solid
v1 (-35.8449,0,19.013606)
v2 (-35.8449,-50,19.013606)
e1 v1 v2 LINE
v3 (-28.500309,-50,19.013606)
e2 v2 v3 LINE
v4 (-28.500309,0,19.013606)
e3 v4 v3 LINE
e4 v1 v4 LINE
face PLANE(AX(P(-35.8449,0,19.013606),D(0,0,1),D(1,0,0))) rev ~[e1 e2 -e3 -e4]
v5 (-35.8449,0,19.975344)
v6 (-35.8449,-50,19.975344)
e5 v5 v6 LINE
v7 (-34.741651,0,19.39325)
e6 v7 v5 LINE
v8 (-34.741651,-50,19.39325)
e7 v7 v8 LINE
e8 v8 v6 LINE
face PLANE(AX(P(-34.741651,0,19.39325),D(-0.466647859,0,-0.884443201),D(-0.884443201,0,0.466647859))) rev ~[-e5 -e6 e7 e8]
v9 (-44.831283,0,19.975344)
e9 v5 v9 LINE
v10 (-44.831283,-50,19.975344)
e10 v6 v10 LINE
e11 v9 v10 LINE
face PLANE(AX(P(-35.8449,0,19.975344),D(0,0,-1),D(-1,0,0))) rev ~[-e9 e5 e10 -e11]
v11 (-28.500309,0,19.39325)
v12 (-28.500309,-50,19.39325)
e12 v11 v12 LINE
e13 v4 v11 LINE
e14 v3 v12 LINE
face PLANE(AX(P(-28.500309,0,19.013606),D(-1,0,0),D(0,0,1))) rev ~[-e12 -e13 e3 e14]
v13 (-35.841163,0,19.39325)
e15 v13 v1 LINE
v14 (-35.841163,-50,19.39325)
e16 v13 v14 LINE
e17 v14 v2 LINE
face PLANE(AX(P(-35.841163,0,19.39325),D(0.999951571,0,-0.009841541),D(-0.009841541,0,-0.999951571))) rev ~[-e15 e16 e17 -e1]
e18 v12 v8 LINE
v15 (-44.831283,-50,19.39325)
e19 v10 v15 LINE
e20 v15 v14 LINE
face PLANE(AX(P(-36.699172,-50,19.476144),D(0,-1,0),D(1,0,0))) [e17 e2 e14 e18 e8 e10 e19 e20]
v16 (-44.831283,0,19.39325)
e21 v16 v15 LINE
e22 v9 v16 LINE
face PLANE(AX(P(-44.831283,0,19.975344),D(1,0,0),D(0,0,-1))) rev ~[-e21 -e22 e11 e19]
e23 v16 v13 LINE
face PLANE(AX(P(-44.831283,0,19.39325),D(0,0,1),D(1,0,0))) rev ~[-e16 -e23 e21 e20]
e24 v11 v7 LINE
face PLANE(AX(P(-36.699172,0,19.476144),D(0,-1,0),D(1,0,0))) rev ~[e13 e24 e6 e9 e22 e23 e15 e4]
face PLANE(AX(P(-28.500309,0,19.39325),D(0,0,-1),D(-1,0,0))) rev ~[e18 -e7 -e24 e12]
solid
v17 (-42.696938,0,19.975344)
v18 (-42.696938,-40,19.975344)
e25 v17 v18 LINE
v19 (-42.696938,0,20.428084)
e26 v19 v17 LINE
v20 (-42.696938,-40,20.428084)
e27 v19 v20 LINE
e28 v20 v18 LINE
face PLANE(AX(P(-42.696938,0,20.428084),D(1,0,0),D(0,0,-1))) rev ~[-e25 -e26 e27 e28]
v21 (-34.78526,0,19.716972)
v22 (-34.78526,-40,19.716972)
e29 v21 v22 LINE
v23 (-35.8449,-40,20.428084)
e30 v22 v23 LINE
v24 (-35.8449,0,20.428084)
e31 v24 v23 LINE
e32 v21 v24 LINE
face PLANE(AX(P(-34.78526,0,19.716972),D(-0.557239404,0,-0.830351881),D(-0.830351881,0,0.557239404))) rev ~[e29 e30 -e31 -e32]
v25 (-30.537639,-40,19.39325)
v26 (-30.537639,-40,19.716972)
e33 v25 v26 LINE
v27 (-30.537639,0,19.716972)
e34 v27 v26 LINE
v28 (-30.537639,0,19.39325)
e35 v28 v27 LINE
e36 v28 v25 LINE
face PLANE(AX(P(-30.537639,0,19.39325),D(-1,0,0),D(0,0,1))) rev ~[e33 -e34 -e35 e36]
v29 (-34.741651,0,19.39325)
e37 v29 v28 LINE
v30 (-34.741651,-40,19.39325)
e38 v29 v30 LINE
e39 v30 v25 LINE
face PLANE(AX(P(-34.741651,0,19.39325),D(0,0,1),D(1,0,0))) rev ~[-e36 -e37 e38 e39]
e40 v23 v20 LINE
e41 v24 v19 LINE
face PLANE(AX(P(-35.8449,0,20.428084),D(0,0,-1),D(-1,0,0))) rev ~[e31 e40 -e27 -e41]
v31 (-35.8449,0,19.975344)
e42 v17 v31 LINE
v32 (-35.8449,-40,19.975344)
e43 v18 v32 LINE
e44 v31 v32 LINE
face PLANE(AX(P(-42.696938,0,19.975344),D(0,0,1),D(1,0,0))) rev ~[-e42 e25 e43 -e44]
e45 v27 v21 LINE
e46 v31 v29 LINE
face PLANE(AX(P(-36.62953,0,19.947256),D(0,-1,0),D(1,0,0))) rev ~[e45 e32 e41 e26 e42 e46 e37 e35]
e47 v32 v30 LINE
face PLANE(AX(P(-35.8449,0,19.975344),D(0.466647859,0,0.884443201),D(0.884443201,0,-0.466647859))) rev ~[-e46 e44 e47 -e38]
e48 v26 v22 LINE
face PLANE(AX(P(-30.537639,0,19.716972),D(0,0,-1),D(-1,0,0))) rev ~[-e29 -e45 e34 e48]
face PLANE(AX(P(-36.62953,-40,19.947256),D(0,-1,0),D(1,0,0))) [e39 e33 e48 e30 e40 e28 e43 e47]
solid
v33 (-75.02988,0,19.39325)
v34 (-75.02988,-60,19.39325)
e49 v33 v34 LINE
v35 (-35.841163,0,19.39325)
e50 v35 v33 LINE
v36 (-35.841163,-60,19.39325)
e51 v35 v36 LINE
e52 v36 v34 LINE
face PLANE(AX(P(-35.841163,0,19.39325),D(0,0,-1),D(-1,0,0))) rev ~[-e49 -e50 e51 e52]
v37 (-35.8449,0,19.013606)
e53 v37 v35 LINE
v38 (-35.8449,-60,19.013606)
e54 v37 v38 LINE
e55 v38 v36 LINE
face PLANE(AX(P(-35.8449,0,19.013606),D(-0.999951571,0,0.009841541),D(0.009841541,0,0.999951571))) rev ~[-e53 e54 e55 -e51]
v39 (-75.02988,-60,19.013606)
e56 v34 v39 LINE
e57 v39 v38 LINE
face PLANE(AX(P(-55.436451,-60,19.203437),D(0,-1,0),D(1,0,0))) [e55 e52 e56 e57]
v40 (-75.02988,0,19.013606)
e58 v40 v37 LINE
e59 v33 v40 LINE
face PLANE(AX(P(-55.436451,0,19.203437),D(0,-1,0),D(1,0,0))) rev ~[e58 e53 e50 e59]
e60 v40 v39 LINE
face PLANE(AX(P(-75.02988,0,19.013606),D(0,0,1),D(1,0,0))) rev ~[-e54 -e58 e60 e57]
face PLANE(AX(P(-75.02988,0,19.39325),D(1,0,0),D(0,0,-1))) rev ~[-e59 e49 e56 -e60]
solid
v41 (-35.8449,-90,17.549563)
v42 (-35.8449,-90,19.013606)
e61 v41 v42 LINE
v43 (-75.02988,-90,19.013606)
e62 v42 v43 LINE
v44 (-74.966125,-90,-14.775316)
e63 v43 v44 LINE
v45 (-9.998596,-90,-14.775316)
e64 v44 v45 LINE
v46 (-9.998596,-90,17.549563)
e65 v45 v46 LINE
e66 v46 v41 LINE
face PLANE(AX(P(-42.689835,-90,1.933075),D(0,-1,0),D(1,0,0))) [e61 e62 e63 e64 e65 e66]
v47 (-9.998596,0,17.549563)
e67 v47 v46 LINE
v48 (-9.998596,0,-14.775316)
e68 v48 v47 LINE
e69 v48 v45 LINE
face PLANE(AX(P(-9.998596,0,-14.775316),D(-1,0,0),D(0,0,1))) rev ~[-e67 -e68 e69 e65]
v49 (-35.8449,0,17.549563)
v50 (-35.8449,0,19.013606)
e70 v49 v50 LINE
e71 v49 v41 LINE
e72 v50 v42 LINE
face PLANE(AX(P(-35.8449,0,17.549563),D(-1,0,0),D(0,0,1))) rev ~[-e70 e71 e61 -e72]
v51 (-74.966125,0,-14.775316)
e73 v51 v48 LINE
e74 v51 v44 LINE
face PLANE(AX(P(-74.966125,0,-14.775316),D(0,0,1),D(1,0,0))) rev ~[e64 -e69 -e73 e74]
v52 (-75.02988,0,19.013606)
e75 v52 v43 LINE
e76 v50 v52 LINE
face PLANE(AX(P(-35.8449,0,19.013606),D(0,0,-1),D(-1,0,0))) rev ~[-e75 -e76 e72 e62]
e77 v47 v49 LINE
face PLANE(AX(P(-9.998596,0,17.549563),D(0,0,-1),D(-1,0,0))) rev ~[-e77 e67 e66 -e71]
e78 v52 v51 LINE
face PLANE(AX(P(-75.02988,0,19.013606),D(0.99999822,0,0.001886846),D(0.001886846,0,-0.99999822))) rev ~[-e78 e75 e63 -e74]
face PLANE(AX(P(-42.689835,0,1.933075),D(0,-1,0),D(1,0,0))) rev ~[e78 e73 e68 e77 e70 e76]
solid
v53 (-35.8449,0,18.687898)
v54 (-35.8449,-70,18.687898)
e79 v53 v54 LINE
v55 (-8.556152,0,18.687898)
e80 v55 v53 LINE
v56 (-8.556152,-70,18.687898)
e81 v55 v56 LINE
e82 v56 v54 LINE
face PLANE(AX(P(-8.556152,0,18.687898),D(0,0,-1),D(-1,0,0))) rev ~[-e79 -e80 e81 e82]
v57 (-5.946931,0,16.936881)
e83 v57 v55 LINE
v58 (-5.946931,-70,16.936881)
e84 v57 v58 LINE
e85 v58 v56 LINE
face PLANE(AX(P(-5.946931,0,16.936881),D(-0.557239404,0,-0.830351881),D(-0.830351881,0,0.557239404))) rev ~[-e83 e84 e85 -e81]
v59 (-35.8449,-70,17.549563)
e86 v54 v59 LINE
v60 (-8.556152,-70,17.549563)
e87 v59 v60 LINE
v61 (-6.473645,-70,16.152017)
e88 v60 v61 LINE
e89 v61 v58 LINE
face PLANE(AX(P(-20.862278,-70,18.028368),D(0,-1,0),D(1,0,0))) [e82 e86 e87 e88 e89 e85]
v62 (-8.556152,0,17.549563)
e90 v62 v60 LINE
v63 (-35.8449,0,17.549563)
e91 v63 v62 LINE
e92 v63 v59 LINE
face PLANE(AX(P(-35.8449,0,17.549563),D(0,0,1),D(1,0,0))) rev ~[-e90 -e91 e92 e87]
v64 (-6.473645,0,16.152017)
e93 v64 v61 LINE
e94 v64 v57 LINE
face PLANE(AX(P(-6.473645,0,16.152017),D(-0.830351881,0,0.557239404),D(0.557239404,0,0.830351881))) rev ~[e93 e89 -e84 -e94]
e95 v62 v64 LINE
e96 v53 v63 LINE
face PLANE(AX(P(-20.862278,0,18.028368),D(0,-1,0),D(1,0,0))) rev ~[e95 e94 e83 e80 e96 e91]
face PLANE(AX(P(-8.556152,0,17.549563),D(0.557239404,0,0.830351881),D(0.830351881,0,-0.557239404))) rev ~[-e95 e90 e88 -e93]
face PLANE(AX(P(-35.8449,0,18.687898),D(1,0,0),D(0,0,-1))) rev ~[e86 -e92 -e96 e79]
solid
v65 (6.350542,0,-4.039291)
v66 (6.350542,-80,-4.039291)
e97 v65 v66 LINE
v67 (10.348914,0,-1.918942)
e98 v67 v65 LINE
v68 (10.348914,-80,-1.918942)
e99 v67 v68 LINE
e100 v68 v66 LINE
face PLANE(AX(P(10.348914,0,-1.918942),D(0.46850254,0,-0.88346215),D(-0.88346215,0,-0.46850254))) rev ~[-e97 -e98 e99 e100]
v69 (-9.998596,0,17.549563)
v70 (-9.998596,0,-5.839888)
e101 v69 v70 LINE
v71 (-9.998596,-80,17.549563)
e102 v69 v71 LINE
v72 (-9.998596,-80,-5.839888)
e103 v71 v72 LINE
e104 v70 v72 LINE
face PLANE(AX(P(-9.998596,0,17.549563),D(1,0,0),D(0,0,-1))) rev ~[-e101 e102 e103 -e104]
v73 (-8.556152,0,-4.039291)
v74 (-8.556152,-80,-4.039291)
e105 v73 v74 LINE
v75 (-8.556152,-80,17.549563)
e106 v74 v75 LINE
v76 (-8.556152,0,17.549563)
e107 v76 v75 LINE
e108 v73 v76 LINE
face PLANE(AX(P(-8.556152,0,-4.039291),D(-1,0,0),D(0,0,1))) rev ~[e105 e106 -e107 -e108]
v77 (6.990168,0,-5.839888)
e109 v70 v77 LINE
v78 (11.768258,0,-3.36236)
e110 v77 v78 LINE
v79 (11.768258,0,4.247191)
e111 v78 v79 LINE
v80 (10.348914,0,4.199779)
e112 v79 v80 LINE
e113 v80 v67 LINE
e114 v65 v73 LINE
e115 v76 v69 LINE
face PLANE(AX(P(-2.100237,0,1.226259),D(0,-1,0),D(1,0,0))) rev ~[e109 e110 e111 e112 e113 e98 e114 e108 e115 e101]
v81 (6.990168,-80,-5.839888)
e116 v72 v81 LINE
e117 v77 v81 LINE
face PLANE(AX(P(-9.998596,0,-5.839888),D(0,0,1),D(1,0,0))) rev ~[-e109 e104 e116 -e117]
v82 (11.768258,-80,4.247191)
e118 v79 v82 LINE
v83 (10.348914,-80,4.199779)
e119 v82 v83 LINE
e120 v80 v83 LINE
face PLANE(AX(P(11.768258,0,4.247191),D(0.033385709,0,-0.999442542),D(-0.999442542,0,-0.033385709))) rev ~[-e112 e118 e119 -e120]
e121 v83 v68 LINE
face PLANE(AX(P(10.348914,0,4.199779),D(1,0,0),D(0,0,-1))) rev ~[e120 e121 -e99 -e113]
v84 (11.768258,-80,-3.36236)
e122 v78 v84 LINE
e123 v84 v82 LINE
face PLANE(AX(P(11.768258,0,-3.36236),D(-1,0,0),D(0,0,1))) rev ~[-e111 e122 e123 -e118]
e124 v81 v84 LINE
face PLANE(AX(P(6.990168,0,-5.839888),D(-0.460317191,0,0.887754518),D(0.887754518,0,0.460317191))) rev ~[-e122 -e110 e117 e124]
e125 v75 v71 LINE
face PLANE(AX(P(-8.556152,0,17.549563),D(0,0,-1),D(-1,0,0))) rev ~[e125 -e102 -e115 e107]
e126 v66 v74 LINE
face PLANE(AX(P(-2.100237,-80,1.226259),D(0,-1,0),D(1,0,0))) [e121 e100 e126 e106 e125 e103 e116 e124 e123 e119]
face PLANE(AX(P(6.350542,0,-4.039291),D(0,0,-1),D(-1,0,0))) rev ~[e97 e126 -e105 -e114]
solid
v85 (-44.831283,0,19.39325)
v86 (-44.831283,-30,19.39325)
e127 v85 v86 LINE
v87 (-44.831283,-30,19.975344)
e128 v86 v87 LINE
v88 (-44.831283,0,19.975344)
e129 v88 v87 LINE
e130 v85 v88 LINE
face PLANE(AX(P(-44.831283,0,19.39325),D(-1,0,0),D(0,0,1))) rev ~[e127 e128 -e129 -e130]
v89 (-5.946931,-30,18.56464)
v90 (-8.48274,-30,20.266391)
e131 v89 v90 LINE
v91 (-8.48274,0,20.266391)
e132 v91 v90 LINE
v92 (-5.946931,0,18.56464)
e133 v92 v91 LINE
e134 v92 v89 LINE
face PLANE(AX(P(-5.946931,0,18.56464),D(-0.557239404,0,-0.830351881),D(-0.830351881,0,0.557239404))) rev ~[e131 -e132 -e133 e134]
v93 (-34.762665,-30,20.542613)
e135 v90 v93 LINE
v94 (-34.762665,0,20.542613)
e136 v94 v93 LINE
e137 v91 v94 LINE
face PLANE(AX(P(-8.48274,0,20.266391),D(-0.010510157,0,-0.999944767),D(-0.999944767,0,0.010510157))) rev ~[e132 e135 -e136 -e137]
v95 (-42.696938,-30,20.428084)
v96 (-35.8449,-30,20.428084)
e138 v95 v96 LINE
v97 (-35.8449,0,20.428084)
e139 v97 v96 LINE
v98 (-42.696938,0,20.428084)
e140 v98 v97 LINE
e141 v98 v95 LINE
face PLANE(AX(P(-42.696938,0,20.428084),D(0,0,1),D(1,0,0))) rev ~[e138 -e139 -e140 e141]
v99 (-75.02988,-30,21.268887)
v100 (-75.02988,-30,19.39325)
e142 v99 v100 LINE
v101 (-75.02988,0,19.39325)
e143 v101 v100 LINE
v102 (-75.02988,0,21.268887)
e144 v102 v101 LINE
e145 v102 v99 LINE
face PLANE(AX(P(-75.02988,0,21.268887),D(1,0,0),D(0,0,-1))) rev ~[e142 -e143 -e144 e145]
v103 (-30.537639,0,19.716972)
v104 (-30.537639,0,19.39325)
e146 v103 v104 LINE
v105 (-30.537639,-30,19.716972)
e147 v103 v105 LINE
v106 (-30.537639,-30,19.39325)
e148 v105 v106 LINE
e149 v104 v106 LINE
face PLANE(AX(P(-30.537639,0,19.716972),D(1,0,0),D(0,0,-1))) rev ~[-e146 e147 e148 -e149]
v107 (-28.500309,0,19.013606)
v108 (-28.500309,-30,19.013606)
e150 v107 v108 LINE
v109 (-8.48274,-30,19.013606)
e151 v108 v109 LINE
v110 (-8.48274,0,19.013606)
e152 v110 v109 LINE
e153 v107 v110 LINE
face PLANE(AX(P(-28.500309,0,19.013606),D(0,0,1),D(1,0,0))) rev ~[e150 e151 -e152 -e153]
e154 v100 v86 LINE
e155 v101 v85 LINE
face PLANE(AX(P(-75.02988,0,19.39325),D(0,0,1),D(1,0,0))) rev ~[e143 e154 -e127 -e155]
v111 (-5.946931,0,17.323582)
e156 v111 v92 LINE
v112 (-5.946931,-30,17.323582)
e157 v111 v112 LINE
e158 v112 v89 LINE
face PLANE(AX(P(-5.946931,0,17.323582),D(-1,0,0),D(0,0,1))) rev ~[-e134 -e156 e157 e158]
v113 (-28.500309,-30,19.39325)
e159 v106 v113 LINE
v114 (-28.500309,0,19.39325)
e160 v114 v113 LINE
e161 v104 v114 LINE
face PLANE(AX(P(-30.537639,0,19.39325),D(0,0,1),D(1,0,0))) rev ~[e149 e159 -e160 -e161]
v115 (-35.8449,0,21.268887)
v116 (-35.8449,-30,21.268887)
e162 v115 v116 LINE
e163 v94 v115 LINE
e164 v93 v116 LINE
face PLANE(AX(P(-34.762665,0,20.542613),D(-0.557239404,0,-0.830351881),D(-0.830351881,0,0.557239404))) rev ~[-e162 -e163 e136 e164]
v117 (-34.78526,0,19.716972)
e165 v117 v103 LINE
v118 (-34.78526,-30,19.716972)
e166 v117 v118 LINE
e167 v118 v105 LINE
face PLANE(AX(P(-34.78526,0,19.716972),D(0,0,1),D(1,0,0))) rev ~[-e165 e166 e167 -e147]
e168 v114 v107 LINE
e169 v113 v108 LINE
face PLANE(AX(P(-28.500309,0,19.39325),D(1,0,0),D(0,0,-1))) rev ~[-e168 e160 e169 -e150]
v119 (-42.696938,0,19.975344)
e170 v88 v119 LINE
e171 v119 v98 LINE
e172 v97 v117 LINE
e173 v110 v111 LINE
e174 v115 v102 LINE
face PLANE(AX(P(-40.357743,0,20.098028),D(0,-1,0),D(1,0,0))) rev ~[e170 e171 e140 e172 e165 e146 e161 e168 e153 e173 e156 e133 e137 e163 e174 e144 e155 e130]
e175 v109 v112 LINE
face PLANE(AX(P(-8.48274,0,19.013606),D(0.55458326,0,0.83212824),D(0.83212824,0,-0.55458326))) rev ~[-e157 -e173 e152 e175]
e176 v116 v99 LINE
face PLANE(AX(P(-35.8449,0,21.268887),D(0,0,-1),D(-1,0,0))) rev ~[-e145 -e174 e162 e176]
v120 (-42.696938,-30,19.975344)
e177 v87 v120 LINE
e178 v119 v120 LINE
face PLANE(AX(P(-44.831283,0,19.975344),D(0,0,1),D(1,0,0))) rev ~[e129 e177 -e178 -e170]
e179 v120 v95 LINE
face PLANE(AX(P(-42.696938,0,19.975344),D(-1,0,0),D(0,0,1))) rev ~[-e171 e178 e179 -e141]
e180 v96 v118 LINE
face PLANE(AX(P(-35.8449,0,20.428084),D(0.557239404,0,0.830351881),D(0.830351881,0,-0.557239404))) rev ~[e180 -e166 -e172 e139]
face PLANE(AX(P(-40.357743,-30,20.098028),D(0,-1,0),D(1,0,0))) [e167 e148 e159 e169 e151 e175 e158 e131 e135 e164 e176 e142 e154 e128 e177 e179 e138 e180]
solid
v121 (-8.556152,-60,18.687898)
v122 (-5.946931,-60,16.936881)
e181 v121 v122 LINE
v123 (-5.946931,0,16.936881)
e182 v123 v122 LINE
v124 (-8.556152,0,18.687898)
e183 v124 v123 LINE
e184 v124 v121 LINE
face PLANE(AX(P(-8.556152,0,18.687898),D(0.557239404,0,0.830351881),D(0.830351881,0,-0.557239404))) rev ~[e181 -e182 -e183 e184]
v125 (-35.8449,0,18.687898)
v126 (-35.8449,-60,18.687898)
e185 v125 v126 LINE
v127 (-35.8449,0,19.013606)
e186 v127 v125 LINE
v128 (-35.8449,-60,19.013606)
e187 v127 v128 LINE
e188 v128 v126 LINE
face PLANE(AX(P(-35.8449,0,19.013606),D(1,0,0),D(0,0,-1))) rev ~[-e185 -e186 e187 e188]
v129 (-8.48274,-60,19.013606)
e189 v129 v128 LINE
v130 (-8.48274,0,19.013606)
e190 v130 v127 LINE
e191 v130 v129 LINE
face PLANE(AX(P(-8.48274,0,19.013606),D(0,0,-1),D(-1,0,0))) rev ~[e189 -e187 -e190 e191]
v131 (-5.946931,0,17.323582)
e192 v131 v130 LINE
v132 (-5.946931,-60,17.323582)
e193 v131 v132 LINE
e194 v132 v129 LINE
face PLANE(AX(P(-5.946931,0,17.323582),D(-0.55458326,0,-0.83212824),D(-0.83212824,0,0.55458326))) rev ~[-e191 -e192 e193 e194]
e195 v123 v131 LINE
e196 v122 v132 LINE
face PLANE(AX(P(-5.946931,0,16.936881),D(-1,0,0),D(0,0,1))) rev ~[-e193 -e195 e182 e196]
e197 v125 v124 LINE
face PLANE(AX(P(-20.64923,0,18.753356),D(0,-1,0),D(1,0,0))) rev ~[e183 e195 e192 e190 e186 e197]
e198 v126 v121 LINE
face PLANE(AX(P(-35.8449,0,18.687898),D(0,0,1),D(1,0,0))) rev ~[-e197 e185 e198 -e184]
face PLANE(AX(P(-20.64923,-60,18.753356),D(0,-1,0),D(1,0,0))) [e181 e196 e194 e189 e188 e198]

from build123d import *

# Parameters (mm, degrees)
F1_DEPTH = 90
F2_DEPTH = 80
F3_DEPTH = 70
F4_DEPTH = 60
F5_DEPTH = 60
F6_DEPTH = 50
F7_DEPTH = 40
F8_DEPTH = 30


# Not quite as in the source:
# - a feature names something its author has since deleted; it is built from what else it names


with BuildPart() as f1:
    # F0 (on Front) → F1 (new body)
    with BuildSketch(Plane.XZ):
        Polygon((-35.844899714, 19.0136060119), (-75.0298798084, 19.0136060119), (-74.9661251903, -14.775316231), (-9.9985962734, -14.775316231), (-9.9985962734, -5.8398880064), (-9.9985962734, 16.2808988243), (-9.9985962734, 17.5495628755), (-35.844899714, 17.5495628755), (-35.844899714, 18.6878981805), align=None)
    extrude(amount=F1_DEPTH)


with BuildPart() as f2:
    # F0 (on Front) → F2 (new body)
    with BuildSketch(Plane.XZ):
        Polygon((-9.9985962734, 16.2808988243), (-9.9985962734, -5.8398880064), (6.9901682436, -5.8398880064), (11.7682581767, -3.3623597119), (11.7682581767, 4.2471913621), (10.3489141911, 4.1997791268), (10.3489141911, -1.9189424347), (6.350541953, -4.0392908268), (-8.5561517044, -4.0392908268), (-8.5561517044, 17.5495628755), (-9.9985962734, 17.5495628755), align=None)
    extrude(amount=F2_DEPTH)


with BuildPart() as f3:
    # F0 (on Front) → F3 (new body)
    with BuildSketch(Plane.XZ):
        Polygon((-8.5561517044, 18.6878981805), (-35.844899714, 18.6878981805), (-35.844899714, 17.5495628755), (-9.9985962734, 17.5495628755), (-8.5561517044, 17.5495628755), (-6.4736446366, 16.1520168185), (-5.9469314412, 16.9368810786), align=None)
    extrude(amount=F3_DEPTH)


with BuildPart() as f4:
    # F0 (on Front) → F4 (new body)
    with BuildSketch(Plane.XZ):
        Polygon((-75.0298798084, 19.3932503462), (-75.0298798084, 19.0136060119), (-35.844899714, 19.0136060119), (-35.8411632478, 19.3932503462), (-44.8312833905, 19.3932503462), align=None)
    extrude(amount=F4_DEPTH)


with BuildPart() as f5:
    # F0 (on Front) → F5 (new body)
    with BuildSketch(Plane.XZ):
        Polygon((-28.500309214, 19.0136060119), (-35.844899714, 19.0136060119), (-35.844899714, 18.6878981805), (-8.5561517044, 18.6878981805), (-5.9469314412, 16.9368810786), (-5.9469314412, 17.3235815018), (-8.4827402607, 19.0136060119), align=None)
    extrude(amount=F5_DEPTH)


with BuildPart() as f6:
    # F0 (on Front) → F6 (new body)
    with BuildSketch(Plane.XZ):
        Polygon((-35.8411632478, 19.3932503462), (-35.844899714, 19.0136060119), (-28.500309214, 19.0136060119), (-28.500309214, 19.3932503462), (-30.5376388133, 19.3932503462), (-34.7416512668, 19.3932503462), (-35.844899714, 19.9753437191), (-42.6969379187, 19.9753437191), (-44.8312833905, 19.9753437191), (-44.8312833905, 19.3932503462), align=None)
    extrude(amount=F6_DEPTH)


with BuildPart() as f7:
    # F0 (on Front) → F7 (new body)
    with BuildSketch(Plane.XZ):
        Polygon((-34.7416512668, 19.3932503462), (-30.5376388133, 19.3932503462), (-30.5376388133, 19.7169722799), (-34.7852603294, 19.7169722799), (-35.844899714, 20.428083837), (-42.6969379187, 20.428083837), (-42.6969379187, 19.9753437191), (-35.844899714, 19.9753437191), align=None)
    extrude(amount=F7_DEPTH)


with BuildPart() as f8:
    # F0 (on Front) → F8 (new body)
    with BuildSketch(Plane.XZ):
        Polygon((-75.0298798084, 21.2688874453), (-75.0298798084, 19.3932503462), (-44.8312833905, 19.3932503462), (-44.8312833905, 19.9753437191), (-42.6969379187, 19.9753437191), (-42.6969379187, 20.428083837), (-35.844899714, 20.428083837), (-34.7852603294, 19.7169722799), (-30.5376388133, 19.7169722799), (-30.5376388133, 19.3932503462), (-28.500309214, 19.3932503462), (-28.500309214, 19.0136060119), (-8.4827402607, 19.0136060119), (-5.9469314412, 17.3235815018), (-5.9469314412, 18.5646397935), (-8.4827402607, 20.2663913369), (-34.7626654522, 20.5426127312), (-35.844899714, 21.2688874453), align=None)
    extrude(amount=F8_DEPTH)


solid = Compound([f1.part, f2.part, f3.part, f4.part, f5.part, f6.part, f7.part, f8.part])
